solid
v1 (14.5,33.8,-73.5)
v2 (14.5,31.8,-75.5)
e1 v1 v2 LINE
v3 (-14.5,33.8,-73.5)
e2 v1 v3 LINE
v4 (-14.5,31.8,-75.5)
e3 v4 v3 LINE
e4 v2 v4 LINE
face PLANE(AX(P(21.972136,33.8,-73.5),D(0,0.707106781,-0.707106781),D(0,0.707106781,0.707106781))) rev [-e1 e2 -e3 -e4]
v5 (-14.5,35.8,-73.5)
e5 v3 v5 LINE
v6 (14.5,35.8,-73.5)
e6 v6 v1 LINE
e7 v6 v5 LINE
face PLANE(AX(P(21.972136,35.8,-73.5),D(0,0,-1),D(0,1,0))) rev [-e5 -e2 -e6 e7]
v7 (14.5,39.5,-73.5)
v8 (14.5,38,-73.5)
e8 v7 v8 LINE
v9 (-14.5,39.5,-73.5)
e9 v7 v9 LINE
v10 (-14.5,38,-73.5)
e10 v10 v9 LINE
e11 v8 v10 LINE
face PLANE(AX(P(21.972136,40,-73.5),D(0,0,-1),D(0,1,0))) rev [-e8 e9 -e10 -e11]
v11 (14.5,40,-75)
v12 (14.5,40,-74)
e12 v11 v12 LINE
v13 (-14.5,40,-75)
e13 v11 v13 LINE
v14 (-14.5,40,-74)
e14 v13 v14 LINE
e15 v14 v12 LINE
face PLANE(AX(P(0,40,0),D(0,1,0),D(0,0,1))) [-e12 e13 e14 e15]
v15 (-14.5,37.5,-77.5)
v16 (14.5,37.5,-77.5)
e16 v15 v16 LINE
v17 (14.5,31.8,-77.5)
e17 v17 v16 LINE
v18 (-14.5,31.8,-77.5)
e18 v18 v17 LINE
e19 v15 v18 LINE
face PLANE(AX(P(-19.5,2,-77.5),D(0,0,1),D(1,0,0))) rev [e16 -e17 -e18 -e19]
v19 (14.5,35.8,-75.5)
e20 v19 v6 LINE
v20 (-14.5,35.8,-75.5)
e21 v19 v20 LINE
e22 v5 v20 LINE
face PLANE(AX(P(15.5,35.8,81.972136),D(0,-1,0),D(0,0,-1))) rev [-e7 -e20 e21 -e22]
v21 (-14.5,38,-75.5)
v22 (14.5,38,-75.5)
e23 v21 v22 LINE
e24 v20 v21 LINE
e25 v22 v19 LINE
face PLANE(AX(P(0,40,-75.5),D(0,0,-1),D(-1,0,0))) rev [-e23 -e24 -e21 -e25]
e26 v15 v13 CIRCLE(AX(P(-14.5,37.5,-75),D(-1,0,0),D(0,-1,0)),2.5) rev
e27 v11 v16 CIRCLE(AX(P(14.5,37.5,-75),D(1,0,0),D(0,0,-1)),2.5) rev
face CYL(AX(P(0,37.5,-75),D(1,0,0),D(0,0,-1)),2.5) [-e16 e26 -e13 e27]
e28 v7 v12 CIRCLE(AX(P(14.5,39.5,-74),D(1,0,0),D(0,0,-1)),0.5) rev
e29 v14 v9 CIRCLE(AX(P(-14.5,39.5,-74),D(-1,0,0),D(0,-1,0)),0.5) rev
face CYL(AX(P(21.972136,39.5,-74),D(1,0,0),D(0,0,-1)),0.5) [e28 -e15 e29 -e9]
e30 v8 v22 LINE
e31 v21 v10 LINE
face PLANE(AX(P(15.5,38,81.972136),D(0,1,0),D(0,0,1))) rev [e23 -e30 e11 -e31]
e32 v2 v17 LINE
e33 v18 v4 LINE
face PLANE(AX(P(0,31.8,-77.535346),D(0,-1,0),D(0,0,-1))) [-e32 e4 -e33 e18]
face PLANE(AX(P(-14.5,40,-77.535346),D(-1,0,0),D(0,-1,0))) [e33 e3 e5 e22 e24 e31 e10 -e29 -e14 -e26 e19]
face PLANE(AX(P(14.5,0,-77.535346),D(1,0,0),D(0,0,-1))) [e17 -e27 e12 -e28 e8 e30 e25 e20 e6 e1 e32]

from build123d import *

# Parameters (mm, degrees)
SKETCH1_W                       = 39
SKETCH1_H                       = 155
BOSS_EXTRUDE1_DEPTH             = 2
BOSS_EXTRUDE2_DEPTH             = 38
SKETCH3_W                       = 2
SKETCH3_H                       = 2
BOSS_EXTRUDE3_DEPTH             = 38
SKETCH4_W                       = 2
SKETCH4_H                       = 2
BOSS_EXTRUDE4_DEPTH             = 151
SKETCH6_W                       = 35
SKETCH6_H                       = 2.2
CUT_EXTRUDE1_DEPTH              = 160.340045186
SKETCH7_W                       = 35
SKETCH7_H                       = 2.2
CUT_EXTRUDE2_DEPTH              = 89.490112442
SKETCH5_W                       = 31
SKETCH5_H                       = 2
BOSS_EXTRUDE5_DEPTH             = 2
BOSS_EXTRUDE6_REACH             = 91.367
SKETCH8_W                       = 2
SKETCH8_H                       = 2
BOSS_EXTRUDE6_DIRECTION_2_REACH = 91.367
SKETCH10_W                      = 2
SKETCH10_H                      = 2.2
SKETCH10_W_2                    = 2.2
SKETCH10_H_2                    = 2
BOSS_EXTRUDE8_DEPTH             = 2
SKETCH11_W                      = 2
SKETCH11_H                      = 2.2
SKETCH11_W_2                    = 2.2
SKETCH11_H_2                    = 2
BOSS_EXTRUDE9_DEPTH             = 2
FILLET2_R                       = 2.5
SKETCH14_W                      = 36.5
SKETCH14_H                      = 7.75
BOSS_EXTRUDE10_DEPTH            = 2
SKETCH13_W                      = 31
SKETCH13_H                      = 3
CUT_EXTRUDE4_DEPTH              = 2
FILLET3_R                       = 2
FILLET4_R                       = 0.5
SKETCH15_R                      = 5.1
CUT_EXTRUDE5_DEPTH              = 90.367219941
SKETCH16_R                      = 7.1
BOSS_EXTRUDE11_DEPTH            = 1
FILLET5_R                       = 0.5
CUT_EXTRUDE3_DEPTH              = 160.340045186
FILLET6_R                       = 0.4
FILLET7_R                       = 0.5
CUT_EXTRUDE6_DEPTH              = 6
SKETCH18_W                      = 29
SKETCH18_H                      = 3
CUT_EXTRUDE8_DEPTH              = 90.367220028
CUT_EXTRUDE11_DEPTH             = 90.367220028
CUT_EXTRUDE11_DEPTH_BACK        = 90.367220028
SKETCH20_W                      = 5
SKETCH20_H                      = 40
SKETCH21_W                      = 29
SKETCH21_H                      = 22.8
CUT_EXTRUDE12_DEPTH             = 43.594013669


with BuildPart() as part:
    # Sketch1 → Boss-Extrude1 (new body)
    with BuildSketch(Plane(origin=(0, 0, 0), x_dir=(1, 0, 0), z_dir=(0, 1, 0))):
        Rectangle(SKETCH1_W, SKETCH1_H)
    extrude(amount=BOSS_EXTRUDE1_DEPTH)

    # Sketch2 → Boss-Extrude2 (add)
    with BuildSketch(Plane(origin=(0, 2, 0), x_dir=(1, 0, 0), z_dir=(0, 1, 0))):
        Polygon((-17.5, -77.5), (-17.5, -75.5), (-17.5, 75.5), (17.5, 75.5), (17.5, -75.5), (17.5, -77.5), (19.5, -77.5), (19.5, 77.5), (-19.5, 77.5), (-19.5, -77.5), align=None)
    extrude(amount=BOSS_EXTRUDE2_DEPTH)

    # Sketch3 → Boss-Extrude3 (add)
    with BuildSketch(Plane(origin=(0, 2, 0), x_dir=(1, 0, 0), z_dir=(0, 1, 0))):
        with Locations((-16.5, -76.5)):
            Rectangle(SKETCH3_W, SKETCH3_H)
        with Locations((-16.5, -72.3)):
            Rectangle(SKETCH3_W, SKETCH3_H)
        with Locations((16.5, -76.5)):
            Rectangle(SKETCH3_W, SKETCH3_H)
        with Locations((16.5, -72.3)):
            Rectangle(SKETCH3_W, SKETCH3_H)
    extrude(amount=BOSS_EXTRUDE3_DEPTH)

    # Sketch4 → Boss-Extrude4 (add)
    with BuildSketch(Plane.XY.offset(-75.5)):
        with Locations((-16.5, 39)):
            Rectangle(SKETCH4_W, SKETCH4_H)
        Polygon((-15.5, 33.8), (-17.5, 31.8), (-17.5, 35.8), (-15.5, 35.8), align=None)
        Polygon((15.5, 35.8), (17.5, 35.8), (17.5, 31.8), (15.5, 33.8), align=None)
        with Locations((16.5, 39)):
            Rectangle(SKETCH4_W, SKETCH4_H)
    extrude(amount=BOSS_EXTRUDE4_DEPTH)

    # Sketch6 → Cut-Extrude1 (cut, through all)
    with BuildSketch(Plane.XY.offset(-75.5)):
        with Locations((0, 36.9)):
            Rectangle(SKETCH6_W, SKETCH6_H)
    extrude(amount=CUT_EXTRUDE1_DEPTH, mode=Mode.SUBTRACT)

    # Sketch7 → Cut-Extrude2 (cut, through all)
    with BuildSketch(Plane(origin=(0, 2, 0), x_dir=(1, 0, 0), z_dir=(0, 1, 0))):
        with Locations((0, -74.4)):
            Rectangle(SKETCH7_W, SKETCH7_H)
    extrude(amount=CUT_EXTRUDE2_DEPTH, mode=Mode.SUBTRACT)

    # Sketch5 → Boss-Extrude5 (add)
    with BuildSketch(Plane(origin=(0, 2, 0), x_dir=(1, 0, 0), z_dir=(0, 1, 0))):
        with Locations((0, -76.5)):
            Rectangle(SKETCH5_W, SKETCH5_H)
        with Locations((0, -72.3)):
            Rectangle(SKETCH5_W, SKETCH5_H)
    extrude(amount=BOSS_EXTRUDE5_DEPTH)

    # Boss-Extrude6: up to this face of the body (flat: up to its plane)
    boss_extrude6_end = Plane(part.part.faces().sort_by_distance((17.5, 16.9, -2.1))[0])
    # Sketch8 → Boss-Extrude6 (add, up to the picked face)
    with BuildSketch(Plane(origin=(0, 0, 0), x_dir=(0, 0, -1), z_dir=(1, 0, 0)), mode=Mode.PRIVATE) as boss_extrude6_sk1:
        with Locations((74.5, 39)):
            Rectangle(SKETCH8_W, SKETCH8_H)
    boss_extrude6_tool1 = split(extrude(boss_extrude6_sk1.sketch, amount=BOSS_EXTRUDE6_REACH, mode=Mode.PRIVATE), bisect_by=boss_extrude6_end, keep=Keep.BOTH, mode=Mode.PRIVATE)
    # Sketch8 → Boss-Extrude6 (add, up to the picked face)
    with BuildSketch(Plane(origin=(0, 0, 0), x_dir=(0, 0, -1), z_dir=(1, 0, 0)), mode=Mode.PRIVATE) as boss_extrude6_sk2:
        Polygon((75.5, 35.8), (73.5, 35.8), (73.5, 33.8), (75.5, 31.8), align=None)
    boss_extrude6_tool2 = split(extrude(boss_extrude6_sk2.sketch, amount=BOSS_EXTRUDE6_REACH, mode=Mode.PRIVATE), bisect_by=boss_extrude6_end, keep=Keep.BOTH, mode=Mode.PRIVATE)
    add(boss_extrude6_tool1.solids().sort_by(Axis((0, 39, -74.5), (1, 0, 0)))[0])
    add(boss_extrude6_tool2.solids().sort_by(Axis((0, 34.244444, -74.611111), (1, 0, 0)))[0])

    # Boss-Extrude6 direction 2: up to this face of the body (flat: up to its plane)
    boss_extrude6_direction_2_end = Plane(part.part.faces().sort_by_distance((-17.5, 16.9, -2.1))[0])
    # Sketch8 → Boss-Extrude6 direction 2 (add, up to the picked face)
    with BuildSketch(Plane(origin=(0, 0, 0), x_dir=(0, 0, -1), z_dir=(1, 0, 0)), mode=Mode.PRIVATE) as boss_extrude6_direction_2_sk1:
        with Locations((74.5, 39)):
            Rectangle(SKETCH8_W, SKETCH8_H)
    boss_extrude6_direction_2_tool1 = split(extrude(boss_extrude6_direction_2_sk1.sketch, amount=-BOSS_EXTRUDE6_DIRECTION_2_REACH, mode=Mode.PRIVATE), bisect_by=boss_extrude6_direction_2_end, keep=Keep.BOTH, mode=Mode.PRIVATE)
    # Sketch8 → Boss-Extrude6 direction 2 (add, up to the picked face)
    with BuildSketch(Plane(origin=(0, 0, 0), x_dir=(0, 0, -1), z_dir=(1, 0, 0)), mode=Mode.PRIVATE) as boss_extrude6_direction_2_sk2:
        Polygon((75.5, 35.8), (73.5, 35.8), (73.5, 33.8), (75.5, 31.8), align=None)
    boss_extrude6_direction_2_tool2 = split(extrude(boss_extrude6_direction_2_sk2.sketch, amount=-BOSS_EXTRUDE6_DIRECTION_2_REACH, mode=Mode.PRIVATE), bisect_by=boss_extrude6_direction_2_end, keep=Keep.BOTH, mode=Mode.PRIVATE)
    add(boss_extrude6_direction_2_tool1.solids().sort_by(Axis((0, 39, -74.5), (-1, 0, 0)))[0])
    add(boss_extrude6_direction_2_tool2.solids().sort_by(Axis((0, 34.244444, -74.611111), (-1, 0, 0)))[0])

    # Sketch10 → Boss-Extrude8 (add)
    with BuildSketch(Plane(origin=(-17.5, 0, 0), x_dir=(0, 0, -1), z_dir=(1, 0, 0))):
        with Locations((-76.5, 36.9)):
            Rectangle(SKETCH10_W, SKETCH10_H)
        with Locations((-74.4, 39)):
            Rectangle(SKETCH10_W_2, SKETCH10_H_2)
    extrude(amount=BOSS_EXTRUDE8_DEPTH)

    # Sketch11 → Boss-Extrude9 (add)
    with BuildSketch(Plane.ZY.offset(-17.5)):
        with Locations((76.5, 36.9)):
            Rectangle(SKETCH11_W, SKETCH11_H)
        with Locations((74.4, 39)):
            Rectangle(SKETCH11_W_2, SKETCH11_H_2)
    extrude(amount=BOSS_EXTRUDE9_DEPTH)

    # Fillet2
    fillet2_edges = [part.edges().sort_by_distance(p)[0] for p in [
        (-17.5, 16.9, 71.3),
        (17.5, 16.9, 71.3),
        (19.5, 20, 77.5),
        (-19.5, 20, 77.5),
        (-19.5, 20, -77.5),
        (-17.5, 16.9, -75.5),
        (17.5, 16.9, -75.5),
        (19.5, 20, -77.5),
        (19.5, 40, 0),
        (-19.5, 40, 0),
        (19.5, 0, 0),
        (-19.5, 0, 0),
        (0, 40, -77.5),
        (0, 0, 77.5),
        (0, 0, -77.5),
        (-17.5, 40, 77.5),
        (17.5, 40, 77.5),
    ]]
    fillet(fillet2_edges, radius=FILLET2_R)

    # Sketch14 → Boss-Extrude10 (add)
    with BuildSketch(Plane.XY.offset(-75.5)):
        with Locations((0, 5.125)):
            Rectangle(SKETCH14_W, SKETCH14_H)
    extrude(amount=BOSS_EXTRUDE10_DEPTH)

    # Sketch13 → Cut-Extrude4 (cut)
    with BuildSketch(Plane(origin=(0, 0, -77.5), x_dir=(-1, 0, 0), z_dir=(0, 0, -1))):
        with Locations((0, 5.5)):
            Rectangle(SKETCH13_W, SKETCH13_H)
    extrude(amount=-CUT_EXTRUDE4_DEPTH, mode=Mode.SUBTRACT)

    # Fillet3
    fillet3_edges = [part.edges().sort_by_distance(p)[0] for p in [
        (0, 9, -73.5),
    ]]
    fillet(fillet3_edges, radius=FILLET3_R - 0.0001)  # a hair under: the kernel refuses the full size

    # Fillet4
    fillet4_edges = [part.edges().sort_by_distance(p)[0] for p in [
        (15.5, 5.5, -75.5),
        (15.5, 4, -76.5),
        (0, 7, -75.5),
        (15.5, 7, -76.5),
        (-15.5, 5.5, -75.5),
        (-15.5, 7, -76.5),
        (0, 4, -75.5),
        (-15.5, 4, -76.5),
        (15.5, 5.5, -77.5),
        (0, 4, -77.5),
        (-15.5, 5.5, -77.5),
        (0, 7, -77.5),
    ]]
    fillet(fillet4_edges, radius=FILLET4_R)

    # Sketch15 → Cut-Extrude5 (cut, through all)
    with BuildSketch(Plane.XZ):
        with Locations(Location((0, 38.75, 0), (0, 0, 270))):
            Circle(SKETCH15_R)
        with Locations(Location((0, -38.75, 0), (0, 0, 270))):
            Circle(SKETCH15_R)
    extrude(amount=-CUT_EXTRUDE5_DEPTH, mode=Mode.SUBTRACT)

    # Sketch16 → Boss-Extrude11 (add)
    with BuildSketch(Plane(origin=(0, 2, 0), x_dir=(1, 0, 0), z_dir=(0, 1, 0))):
        with Locations(Location((0, 38.75, 0), (0, 0, 270))):
            Circle(SKETCH16_R)
        with Locations(Location((0, -38.75, 0), (0, 0, 270))):
            Circle(SKETCH16_R)
    extrude(amount=BOSS_EXTRUDE11_DEPTH)

    # Fillet5
    fillet5_edges = [part.edges().sort_by_distance(p)[0] for p in [
        (0, 2, -45.85),
        (0, 3, -45.85),
        (0, 2, 31.65),
        (0, 3, 31.65),
    ]]
    fillet(fillet5_edges, radius=FILLET5_R - 0.0001)  # a hair under: the kernel refuses the full size

    # Sketch12 → Cut-Extrude3 (cut, through all)
    with BuildSketch(Plane.XY.offset(-75.5)):
        with BuildLine():
            Line((1.668907005, 12.688040659), (2.22520934, 10.250720878))
            ThreePointArc((2.22520934, 10.250720878), (4.338837391, 10.990311321), (6.234898019, 12.181685175))
            Line((6.234898019, 12.181685175), (4.676173514, 14.136263881))
            ThreePointArc((4.676173514, 14.136263881), (3.254128043, 13.242733491), (1.668907005, 12.688040659))
        make_face()
        with BuildLine():
            ThreePointArc((-6.234898019, 12.181685175), (-4.338837391, 10.990311321), (-2.22520934, 10.250720878))
            Line((-2.22520934, 10.250720878), (-1.668907005, 12.688040659))
            ThreePointArc((-1.668907005, 12.688040659), (-3.254128043, 13.242733491), (-4.676173514, 14.136263881))
            Line((-4.676173514, 14.136263881), (-6.234898019, 12.181685175))
        make_face()
        with BuildLine():
            ThreePointArc((-10, 20), (-9.749279122, 17.77479066), (-9.009688679, 15.661162609))
            Line((-9.009688679, 15.661162609), (-6.757266509, 16.745871957))
            ThreePointArc((-6.757266509, 16.745871957), (-7.311959341, 18.331092995), (-7.5, 20))
            Line((-7.5, 20), (-10, 20))
        make_face()
        with BuildLine():
            ThreePointArc((-6.234898019, 27.818314825), (-7.818314825, 26.234898019), (-9.009688679, 24.338837391))
            Line((-9.009688679, 24.338837391), (-6.757266509, 23.254128043))
            ThreePointArc((-6.757266509, 23.254128043), (-5.863736119, 24.676173514), (-4.676173514, 25.863736119))
            Line((-4.676173514, 25.863736119), (-6.234898019, 27.818314825))
        make_face()
        with BuildLine():
            ThreePointArc((-1.668907005, 27.311959341), (-0.839733571, 27.452841574), (0, 27.5))
            Line((0, 27.5), (0, 30))
            ThreePointArc((0, 30), (-1.119644761, 29.937122099), (-2.22520934, 29.749279122))
            Line((-2.22520934, 29.749279122), (-1.668907005, 27.311959341))
        make_face()
        with BuildLine():
            Line((0, 30), (0, 27.5))
            ThreePointArc((0, 27.5), (0.839733571, 27.452841574), (1.668907005, 27.311959341))
            Line((1.668907005, 27.311959341), (2.22520934, 29.749279122))
            ThreePointArc((2.22520934, 29.749279122), (1.119644761, 29.937122099), (0, 30))
        make_face()
        with BuildLine():
            Line((6.757266509, 23.254128043), (9.009688679, 24.338837391))
            ThreePointArc((9.009688679, 24.338837391), (7.818314825, 26.234898019), (6.234898019, 27.818314825))
            Line((6.234898019, 27.818314825), (4.676173514, 25.863736119))
            ThreePointArc((4.676173514, 25.863736119), (5.863736119, 24.676173514), (6.757266509, 23.254128043))
        make_face()
        with BuildLine():
            Line((6.757266509, 16.745871957), (9.009688679, 15.661162609))
            ThreePointArc((9.009688679, 15.661162609), (9.749279122, 17.77479066), (10, 20))
            Line((10, 20), (7.5, 20))
            ThreePointArc((7.5, 20), (7.311959341, 18.331092995), (6.757266509, 16.745871957))
        make_face()
        with BuildLine():
            ThreePointArc((2.5, 20), (2.43731978, 19.443697665), (2.25242217, 18.915290652))
            Line((2.25242217, 18.915290652), (4.50484434, 17.830581304))
            ThreePointArc((4.50484434, 17.830581304), (4.874639561, 18.88739533), (5, 20))
            Line((5, 20), (2.5, 20))
        make_face()
        with BuildLine():
            ThreePointArc((1.558724505, 21.954578706), (1.954578706, 21.558724505), (2.25242217, 21.084709348))
            Line((2.25242217, 21.084709348), (4.50484434, 22.169418696))
            ThreePointArc((4.50484434, 22.169418696), (3.909157412, 23.117449009), (3.117449009, 23.909157412))
            Line((3.117449009, 23.909157412), (1.558724505, 21.954578706))
        make_face()
        with BuildLine():
            Line((0, 25), (0, 22.5))
            ThreePointArc((0, 22.5), (0.27991119, 22.484280525), (0.556302335, 22.43731978))
            Line((0.556302335, 22.43731978), (1.11260467, 24.874639561))
            ThreePointArc((1.11260467, 24.874639561), (0.559822381, 24.968561049), (0, 25))
        make_face()
        with BuildLine():
            ThreePointArc((-0.556302335, 22.43731978), (-0.27991119, 22.484280525), (0, 22.5))
            Line((0, 22.5), (0, 25))
            ThreePointArc((0, 25), (-0.559822381, 24.968561049), (-1.11260467, 24.874639561))
            Line((-1.11260467, 24.874639561), (-0.556302335, 22.43731978))
        make_face()
        with BuildLine():
            ThreePointArc((-2.25242217, 21.084709348), (-1.954578706, 21.558724505), (-1.558724505, 21.954578706))
            Line((-1.558724505, 21.954578706), (-3.117449009, 23.909157412))
            ThreePointArc((-3.117449009, 23.909157412), (-3.909157412, 23.117449009), (-4.50484434, 22.169418696))
            Line((-4.50484434, 22.169418696), (-2.25242217, 21.084709348))
        make_face()
        with BuildLine():
            ThreePointArc((-2.25242217, 18.915290652), (-2.43731978, 19.443697665), (-2.5, 20))
            Line((-2.5, 20), (-5, 20))
            ThreePointArc((-5, 20), (-4.874639561, 18.88739533), (-4.50484434, 17.830581304))
            Line((-4.50484434, 17.830581304), (-2.25242217, 18.915290652))
        make_face()
        with BuildLine():
            ThreePointArc((-3.117449009, 16.090842588), (-2.169418696, 15.49515566), (-1.11260467, 15.125360439))
            Line((-1.11260467, 15.125360439), (-0.556302335, 17.56268022))
            ThreePointArc((-0.556302335, 17.56268022), (-1.084709348, 17.74757783), (-1.558724505, 18.045421294))
            Line((-1.558724505, 18.045421294), (-3.117449009, 16.090842588))
        make_face()
        with BuildLine():
            Line((0.556302335, 17.56268022), (1.11260467, 15.125360439))
            ThreePointArc((1.11260467, 15.125360439), (2.169418696, 15.49515566), (3.117449009, 16.090842588))
            Line((3.117449009, 16.090842588), (1.558724505, 18.045421294))
            ThreePointArc((1.558724505, 18.045421294), (1.084709348, 17.74757783), (0.556302335, 17.56268022))
        make_face()
    extrude(amount=-CUT_EXTRUDE3_DEPTH, mode=Mode.SUBTRACT)

    # Fillet6
    fillet6_edges = [part.edges().sort_by_distance(p)[0] for p in [
        (5.863736119, 24.676173514, -75.5),
        (5.455535766, 26.841025472, -75.5),
        (7.818314825, 26.234898019, -77.5),
        (7.883477594, 23.796482717, -77.5),
        (5.863736119, 24.676173514, -77.5),
        (5.455535766, 26.841025472, -77.5),
        (7.883477594, 23.796482717, -75.5),
        (7.818314825, 26.234898019, -75.5),
        (7.311959341, 18.331092995, -75.5),
        (8.75, 20, -75.5),
        (9.749279122, 17.77479066, -77.5),
        (7.883477594, 16.203517283, -77.5),
        (7.311959341, 18.331092995, -77.5),
        (8.75, 20, -77.5),
        (7.883477594, 16.203517283, -75.5),
        (9.749279122, 17.77479066, -75.5),
        (2.43731978, 19.443697665, -75.5),
        (3.75, 20, -75.5),
        (4.874639561, 18.88739533, -77.5),
        (3.378633255, 18.372935978, -77.5),
        (2.43731978, 19.443697665, -77.5),
        (3.75, 20, -77.5),
        (3.378633255, 18.372935978, -75.5),
        (4.874639561, 18.88739533, -75.5),
        (1.954578706, 21.558724505, -75.5),
        (2.338086757, 22.931868059, -75.5),
        (3.909157412, 23.117449009, -77.5),
        (3.378633255, 21.627064022, -77.5),
        (1.954578706, 21.558724505, -77.5),
        (2.338086757, 22.931868059, -77.5),
        (3.378633255, 21.627064022, -75.5),
        (3.909157412, 23.117449009, -75.5),
        (0, 27.5, -75.5),
        (-1.947058172, 28.530619232, -75.5),
        (0, 30, -77.5),
        (1.947058172, 28.530619232, -77.5),
        (0, 27.5, -77.5),
        (-1.947058172, 28.530619232, -77.5),
        (1.947058172, 28.530619232, -75.5),
        (0, 30, -75.5),
        (-5.863736119, 24.676173514, -75.5),
        (-7.883477594, 23.796482717, -75.5),
        (-7.818314825, 26.234898019, -77.5),
        (-5.455535766, 26.841025472, -77.5),
        (-5.863736119, 24.676173514, -77.5),
        (-7.883477594, 23.796482717, -77.5),
        (-5.455535766, 26.841025472, -75.5),
        (-7.818314825, 26.234898019, -75.5),
        (-7.311959341, 18.331092995, -75.5),
        (-7.883477594, 16.203517283, -75.5),
        (-9.749279122, 17.77479066, -77.5),
        (-8.75, 20, -77.5),
        (-7.311959341, 18.331092995, -77.5),
        (-7.883477594, 16.203517283, -77.5),
        (-8.75, 20, -75.5),
        (-9.749279122, 17.77479066, -75.5),
        (-3.254128043, 13.242733491, -75.5),
        (-1.947058172, 11.469380768, -75.5),
        (-4.338837391, 10.990311321, -77.5),
        (-5.455535766, 13.158974528, -77.5),
        (-3.254128043, 13.242733491, -77.5),
        (-1.947058172, 11.469380768, -77.5),
        (-5.455535766, 13.158974528, -75.5),
        (-4.338837391, 10.990311321, -75.5),
        (1.084709348, 17.74757783, -75.5),
        (2.338086757, 17.068131941, -75.5),
        (2.169418696, 15.49515566, -77.5),
        (0.834453502, 16.344020329, -77.5),
        (1.084709348, 17.74757783, -77.5),
        (2.338086757, 17.068131941, -77.5),
        (0.834453502, 16.344020329, -75.5),
        (2.169418696, 15.49515566, -75.5),
        (-2.43731978, 19.443697665, -75.5),
        (-3.378633255, 18.372935978, -75.5),
        (-4.874639561, 18.88739533, -77.5),
        (-3.75, 20, -77.5),
        (-2.43731978, 19.443697665, -77.5),
        (-3.378633255, 18.372935978, -77.5),
        (-3.75, 20, -75.5),
        (-4.874639561, 18.88739533, -75.5),
        (-1.084709348, 17.74757783, -75.5),
        (-0.834453502, 16.344020329, -75.5),
        (-2.169418696, 15.49515566, -77.5),
        (-2.338086757, 17.068131941, -77.5),
        (-1.084709348, 17.74757783, -77.5),
        (-0.834453502, 16.344020329, -77.5),
        (-2.338086757, 17.068131941, -75.5),
        (-2.169418696, 15.49515566, -75.5),
        (-1.954578706, 21.558724505, -75.5),
        (-3.378633255, 21.627064022, -75.5),
        (-3.909157412, 23.117449009, -77.5),
        (-2.338086757, 22.931868059, -77.5),
        (-1.954578706, 21.558724505, -77.5),
        (-3.378633255, 21.627064022, -77.5),
        (-2.338086757, 22.931868059, -75.5),
        (-3.909157412, 23.117449009, -75.5),
        (0, 25, -77.5),
        (0.834453502, 23.655979671, -77.5),
        (0, 22.5, -75.5),
        (-0.834453502, 23.655979671, -75.5),
        (0, 22.5, -77.5),
        (-0.834453502, 23.655979671, -77.5),
        (0, 25, -75.5),
        (0.834453502, 23.655979671, -75.5),
        (3.254128043, 13.242733491, -75.5),
        (5.455535766, 13.158974528, -75.5),
        (4.338837391, 10.990311321, -77.5),
        (1.947058172, 11.469380768, -77.5),
        (3.254128043, 13.242733491, -77.5),
        (5.455535766, 13.158974528, -77.5),
        (1.947058172, 11.469380768, -75.5),
        (4.338837391, 10.990311321, -75.5),
    ]]
    fillet(fillet6_edges, radius=FILLET6_R)

    # Fillet7
    fillet7_edges = [part.edges().sort_by_distance(p)[0] for p in [
        (15.5, 40, 0.75),
        (0, 4, 77.5),
        (0, 40, -73.5),
        (-15.5, 40, 0.75),
        (-15.5, 20.75, 77.5),
        (-15.5, 39.267766953, 76.767766953),
        (15.5, 20.75, 77.5),
        (15.5, 39.267766953, 76.767766953),
    ]]
    fillet(fillet7_edges, radius=FILLET7_R)

    # Sketch17 → Cut-Extrude6 (cut)
    with BuildSketch(Plane.XZ):
        Polygon((-17, -77.5), (-17, 70.299999999), (-14.999999999, 71.3), (-14.999999999, 77.5), (14.999999999, 77.5), (14.999999999, 71.3), (17, 70.299999999), (17, -77.5), align=None)
    extrude(amount=-CUT_EXTRUDE6_DEPTH, mode=Mode.SUBTRACT)

    # Sketch18 → Cut-Extrude8 (cut, through all)
    with BuildSketch(Plane.XY):
        with Locations((0, 7.5)):
            Rectangle(SKETCH18_W, SKETCH18_H)
    extrude(amount=-CUT_EXTRUDE8_DEPTH, mode=Mode.SUBTRACT)

    # Sketch20 → Cut-Extrude11 (cut, two sides: drawn at the far end of the back side and taken through both)
    with BuildSketch(Plane.XY.offset(-CUT_EXTRUDE11_DEPTH_BACK)):
        Polygon((19.5, 40), (14.5, 40), (14.5, 6), (14.5, 0), (19.5, 0), align=None)
        with Locations((-17, 20)):
            Rectangle(SKETCH20_W, SKETCH20_H)
    extrude(amount=CUT_EXTRUDE11_DEPTH + CUT_EXTRUDE11_DEPTH_BACK, mode=Mode.SUBTRACT)

    # Sketch21 → Cut-Extrude12 (cut, through all)
    with BuildSketch(Plane.XY.offset(-75.5)):
        with Locations((0, 20.4)):
            Rectangle(SKETCH21_W, SKETCH21_H)
    extrude(amount=-CUT_EXTRUDE12_DEPTH, mode=Mode.SUBTRACT)


solid = part.part
